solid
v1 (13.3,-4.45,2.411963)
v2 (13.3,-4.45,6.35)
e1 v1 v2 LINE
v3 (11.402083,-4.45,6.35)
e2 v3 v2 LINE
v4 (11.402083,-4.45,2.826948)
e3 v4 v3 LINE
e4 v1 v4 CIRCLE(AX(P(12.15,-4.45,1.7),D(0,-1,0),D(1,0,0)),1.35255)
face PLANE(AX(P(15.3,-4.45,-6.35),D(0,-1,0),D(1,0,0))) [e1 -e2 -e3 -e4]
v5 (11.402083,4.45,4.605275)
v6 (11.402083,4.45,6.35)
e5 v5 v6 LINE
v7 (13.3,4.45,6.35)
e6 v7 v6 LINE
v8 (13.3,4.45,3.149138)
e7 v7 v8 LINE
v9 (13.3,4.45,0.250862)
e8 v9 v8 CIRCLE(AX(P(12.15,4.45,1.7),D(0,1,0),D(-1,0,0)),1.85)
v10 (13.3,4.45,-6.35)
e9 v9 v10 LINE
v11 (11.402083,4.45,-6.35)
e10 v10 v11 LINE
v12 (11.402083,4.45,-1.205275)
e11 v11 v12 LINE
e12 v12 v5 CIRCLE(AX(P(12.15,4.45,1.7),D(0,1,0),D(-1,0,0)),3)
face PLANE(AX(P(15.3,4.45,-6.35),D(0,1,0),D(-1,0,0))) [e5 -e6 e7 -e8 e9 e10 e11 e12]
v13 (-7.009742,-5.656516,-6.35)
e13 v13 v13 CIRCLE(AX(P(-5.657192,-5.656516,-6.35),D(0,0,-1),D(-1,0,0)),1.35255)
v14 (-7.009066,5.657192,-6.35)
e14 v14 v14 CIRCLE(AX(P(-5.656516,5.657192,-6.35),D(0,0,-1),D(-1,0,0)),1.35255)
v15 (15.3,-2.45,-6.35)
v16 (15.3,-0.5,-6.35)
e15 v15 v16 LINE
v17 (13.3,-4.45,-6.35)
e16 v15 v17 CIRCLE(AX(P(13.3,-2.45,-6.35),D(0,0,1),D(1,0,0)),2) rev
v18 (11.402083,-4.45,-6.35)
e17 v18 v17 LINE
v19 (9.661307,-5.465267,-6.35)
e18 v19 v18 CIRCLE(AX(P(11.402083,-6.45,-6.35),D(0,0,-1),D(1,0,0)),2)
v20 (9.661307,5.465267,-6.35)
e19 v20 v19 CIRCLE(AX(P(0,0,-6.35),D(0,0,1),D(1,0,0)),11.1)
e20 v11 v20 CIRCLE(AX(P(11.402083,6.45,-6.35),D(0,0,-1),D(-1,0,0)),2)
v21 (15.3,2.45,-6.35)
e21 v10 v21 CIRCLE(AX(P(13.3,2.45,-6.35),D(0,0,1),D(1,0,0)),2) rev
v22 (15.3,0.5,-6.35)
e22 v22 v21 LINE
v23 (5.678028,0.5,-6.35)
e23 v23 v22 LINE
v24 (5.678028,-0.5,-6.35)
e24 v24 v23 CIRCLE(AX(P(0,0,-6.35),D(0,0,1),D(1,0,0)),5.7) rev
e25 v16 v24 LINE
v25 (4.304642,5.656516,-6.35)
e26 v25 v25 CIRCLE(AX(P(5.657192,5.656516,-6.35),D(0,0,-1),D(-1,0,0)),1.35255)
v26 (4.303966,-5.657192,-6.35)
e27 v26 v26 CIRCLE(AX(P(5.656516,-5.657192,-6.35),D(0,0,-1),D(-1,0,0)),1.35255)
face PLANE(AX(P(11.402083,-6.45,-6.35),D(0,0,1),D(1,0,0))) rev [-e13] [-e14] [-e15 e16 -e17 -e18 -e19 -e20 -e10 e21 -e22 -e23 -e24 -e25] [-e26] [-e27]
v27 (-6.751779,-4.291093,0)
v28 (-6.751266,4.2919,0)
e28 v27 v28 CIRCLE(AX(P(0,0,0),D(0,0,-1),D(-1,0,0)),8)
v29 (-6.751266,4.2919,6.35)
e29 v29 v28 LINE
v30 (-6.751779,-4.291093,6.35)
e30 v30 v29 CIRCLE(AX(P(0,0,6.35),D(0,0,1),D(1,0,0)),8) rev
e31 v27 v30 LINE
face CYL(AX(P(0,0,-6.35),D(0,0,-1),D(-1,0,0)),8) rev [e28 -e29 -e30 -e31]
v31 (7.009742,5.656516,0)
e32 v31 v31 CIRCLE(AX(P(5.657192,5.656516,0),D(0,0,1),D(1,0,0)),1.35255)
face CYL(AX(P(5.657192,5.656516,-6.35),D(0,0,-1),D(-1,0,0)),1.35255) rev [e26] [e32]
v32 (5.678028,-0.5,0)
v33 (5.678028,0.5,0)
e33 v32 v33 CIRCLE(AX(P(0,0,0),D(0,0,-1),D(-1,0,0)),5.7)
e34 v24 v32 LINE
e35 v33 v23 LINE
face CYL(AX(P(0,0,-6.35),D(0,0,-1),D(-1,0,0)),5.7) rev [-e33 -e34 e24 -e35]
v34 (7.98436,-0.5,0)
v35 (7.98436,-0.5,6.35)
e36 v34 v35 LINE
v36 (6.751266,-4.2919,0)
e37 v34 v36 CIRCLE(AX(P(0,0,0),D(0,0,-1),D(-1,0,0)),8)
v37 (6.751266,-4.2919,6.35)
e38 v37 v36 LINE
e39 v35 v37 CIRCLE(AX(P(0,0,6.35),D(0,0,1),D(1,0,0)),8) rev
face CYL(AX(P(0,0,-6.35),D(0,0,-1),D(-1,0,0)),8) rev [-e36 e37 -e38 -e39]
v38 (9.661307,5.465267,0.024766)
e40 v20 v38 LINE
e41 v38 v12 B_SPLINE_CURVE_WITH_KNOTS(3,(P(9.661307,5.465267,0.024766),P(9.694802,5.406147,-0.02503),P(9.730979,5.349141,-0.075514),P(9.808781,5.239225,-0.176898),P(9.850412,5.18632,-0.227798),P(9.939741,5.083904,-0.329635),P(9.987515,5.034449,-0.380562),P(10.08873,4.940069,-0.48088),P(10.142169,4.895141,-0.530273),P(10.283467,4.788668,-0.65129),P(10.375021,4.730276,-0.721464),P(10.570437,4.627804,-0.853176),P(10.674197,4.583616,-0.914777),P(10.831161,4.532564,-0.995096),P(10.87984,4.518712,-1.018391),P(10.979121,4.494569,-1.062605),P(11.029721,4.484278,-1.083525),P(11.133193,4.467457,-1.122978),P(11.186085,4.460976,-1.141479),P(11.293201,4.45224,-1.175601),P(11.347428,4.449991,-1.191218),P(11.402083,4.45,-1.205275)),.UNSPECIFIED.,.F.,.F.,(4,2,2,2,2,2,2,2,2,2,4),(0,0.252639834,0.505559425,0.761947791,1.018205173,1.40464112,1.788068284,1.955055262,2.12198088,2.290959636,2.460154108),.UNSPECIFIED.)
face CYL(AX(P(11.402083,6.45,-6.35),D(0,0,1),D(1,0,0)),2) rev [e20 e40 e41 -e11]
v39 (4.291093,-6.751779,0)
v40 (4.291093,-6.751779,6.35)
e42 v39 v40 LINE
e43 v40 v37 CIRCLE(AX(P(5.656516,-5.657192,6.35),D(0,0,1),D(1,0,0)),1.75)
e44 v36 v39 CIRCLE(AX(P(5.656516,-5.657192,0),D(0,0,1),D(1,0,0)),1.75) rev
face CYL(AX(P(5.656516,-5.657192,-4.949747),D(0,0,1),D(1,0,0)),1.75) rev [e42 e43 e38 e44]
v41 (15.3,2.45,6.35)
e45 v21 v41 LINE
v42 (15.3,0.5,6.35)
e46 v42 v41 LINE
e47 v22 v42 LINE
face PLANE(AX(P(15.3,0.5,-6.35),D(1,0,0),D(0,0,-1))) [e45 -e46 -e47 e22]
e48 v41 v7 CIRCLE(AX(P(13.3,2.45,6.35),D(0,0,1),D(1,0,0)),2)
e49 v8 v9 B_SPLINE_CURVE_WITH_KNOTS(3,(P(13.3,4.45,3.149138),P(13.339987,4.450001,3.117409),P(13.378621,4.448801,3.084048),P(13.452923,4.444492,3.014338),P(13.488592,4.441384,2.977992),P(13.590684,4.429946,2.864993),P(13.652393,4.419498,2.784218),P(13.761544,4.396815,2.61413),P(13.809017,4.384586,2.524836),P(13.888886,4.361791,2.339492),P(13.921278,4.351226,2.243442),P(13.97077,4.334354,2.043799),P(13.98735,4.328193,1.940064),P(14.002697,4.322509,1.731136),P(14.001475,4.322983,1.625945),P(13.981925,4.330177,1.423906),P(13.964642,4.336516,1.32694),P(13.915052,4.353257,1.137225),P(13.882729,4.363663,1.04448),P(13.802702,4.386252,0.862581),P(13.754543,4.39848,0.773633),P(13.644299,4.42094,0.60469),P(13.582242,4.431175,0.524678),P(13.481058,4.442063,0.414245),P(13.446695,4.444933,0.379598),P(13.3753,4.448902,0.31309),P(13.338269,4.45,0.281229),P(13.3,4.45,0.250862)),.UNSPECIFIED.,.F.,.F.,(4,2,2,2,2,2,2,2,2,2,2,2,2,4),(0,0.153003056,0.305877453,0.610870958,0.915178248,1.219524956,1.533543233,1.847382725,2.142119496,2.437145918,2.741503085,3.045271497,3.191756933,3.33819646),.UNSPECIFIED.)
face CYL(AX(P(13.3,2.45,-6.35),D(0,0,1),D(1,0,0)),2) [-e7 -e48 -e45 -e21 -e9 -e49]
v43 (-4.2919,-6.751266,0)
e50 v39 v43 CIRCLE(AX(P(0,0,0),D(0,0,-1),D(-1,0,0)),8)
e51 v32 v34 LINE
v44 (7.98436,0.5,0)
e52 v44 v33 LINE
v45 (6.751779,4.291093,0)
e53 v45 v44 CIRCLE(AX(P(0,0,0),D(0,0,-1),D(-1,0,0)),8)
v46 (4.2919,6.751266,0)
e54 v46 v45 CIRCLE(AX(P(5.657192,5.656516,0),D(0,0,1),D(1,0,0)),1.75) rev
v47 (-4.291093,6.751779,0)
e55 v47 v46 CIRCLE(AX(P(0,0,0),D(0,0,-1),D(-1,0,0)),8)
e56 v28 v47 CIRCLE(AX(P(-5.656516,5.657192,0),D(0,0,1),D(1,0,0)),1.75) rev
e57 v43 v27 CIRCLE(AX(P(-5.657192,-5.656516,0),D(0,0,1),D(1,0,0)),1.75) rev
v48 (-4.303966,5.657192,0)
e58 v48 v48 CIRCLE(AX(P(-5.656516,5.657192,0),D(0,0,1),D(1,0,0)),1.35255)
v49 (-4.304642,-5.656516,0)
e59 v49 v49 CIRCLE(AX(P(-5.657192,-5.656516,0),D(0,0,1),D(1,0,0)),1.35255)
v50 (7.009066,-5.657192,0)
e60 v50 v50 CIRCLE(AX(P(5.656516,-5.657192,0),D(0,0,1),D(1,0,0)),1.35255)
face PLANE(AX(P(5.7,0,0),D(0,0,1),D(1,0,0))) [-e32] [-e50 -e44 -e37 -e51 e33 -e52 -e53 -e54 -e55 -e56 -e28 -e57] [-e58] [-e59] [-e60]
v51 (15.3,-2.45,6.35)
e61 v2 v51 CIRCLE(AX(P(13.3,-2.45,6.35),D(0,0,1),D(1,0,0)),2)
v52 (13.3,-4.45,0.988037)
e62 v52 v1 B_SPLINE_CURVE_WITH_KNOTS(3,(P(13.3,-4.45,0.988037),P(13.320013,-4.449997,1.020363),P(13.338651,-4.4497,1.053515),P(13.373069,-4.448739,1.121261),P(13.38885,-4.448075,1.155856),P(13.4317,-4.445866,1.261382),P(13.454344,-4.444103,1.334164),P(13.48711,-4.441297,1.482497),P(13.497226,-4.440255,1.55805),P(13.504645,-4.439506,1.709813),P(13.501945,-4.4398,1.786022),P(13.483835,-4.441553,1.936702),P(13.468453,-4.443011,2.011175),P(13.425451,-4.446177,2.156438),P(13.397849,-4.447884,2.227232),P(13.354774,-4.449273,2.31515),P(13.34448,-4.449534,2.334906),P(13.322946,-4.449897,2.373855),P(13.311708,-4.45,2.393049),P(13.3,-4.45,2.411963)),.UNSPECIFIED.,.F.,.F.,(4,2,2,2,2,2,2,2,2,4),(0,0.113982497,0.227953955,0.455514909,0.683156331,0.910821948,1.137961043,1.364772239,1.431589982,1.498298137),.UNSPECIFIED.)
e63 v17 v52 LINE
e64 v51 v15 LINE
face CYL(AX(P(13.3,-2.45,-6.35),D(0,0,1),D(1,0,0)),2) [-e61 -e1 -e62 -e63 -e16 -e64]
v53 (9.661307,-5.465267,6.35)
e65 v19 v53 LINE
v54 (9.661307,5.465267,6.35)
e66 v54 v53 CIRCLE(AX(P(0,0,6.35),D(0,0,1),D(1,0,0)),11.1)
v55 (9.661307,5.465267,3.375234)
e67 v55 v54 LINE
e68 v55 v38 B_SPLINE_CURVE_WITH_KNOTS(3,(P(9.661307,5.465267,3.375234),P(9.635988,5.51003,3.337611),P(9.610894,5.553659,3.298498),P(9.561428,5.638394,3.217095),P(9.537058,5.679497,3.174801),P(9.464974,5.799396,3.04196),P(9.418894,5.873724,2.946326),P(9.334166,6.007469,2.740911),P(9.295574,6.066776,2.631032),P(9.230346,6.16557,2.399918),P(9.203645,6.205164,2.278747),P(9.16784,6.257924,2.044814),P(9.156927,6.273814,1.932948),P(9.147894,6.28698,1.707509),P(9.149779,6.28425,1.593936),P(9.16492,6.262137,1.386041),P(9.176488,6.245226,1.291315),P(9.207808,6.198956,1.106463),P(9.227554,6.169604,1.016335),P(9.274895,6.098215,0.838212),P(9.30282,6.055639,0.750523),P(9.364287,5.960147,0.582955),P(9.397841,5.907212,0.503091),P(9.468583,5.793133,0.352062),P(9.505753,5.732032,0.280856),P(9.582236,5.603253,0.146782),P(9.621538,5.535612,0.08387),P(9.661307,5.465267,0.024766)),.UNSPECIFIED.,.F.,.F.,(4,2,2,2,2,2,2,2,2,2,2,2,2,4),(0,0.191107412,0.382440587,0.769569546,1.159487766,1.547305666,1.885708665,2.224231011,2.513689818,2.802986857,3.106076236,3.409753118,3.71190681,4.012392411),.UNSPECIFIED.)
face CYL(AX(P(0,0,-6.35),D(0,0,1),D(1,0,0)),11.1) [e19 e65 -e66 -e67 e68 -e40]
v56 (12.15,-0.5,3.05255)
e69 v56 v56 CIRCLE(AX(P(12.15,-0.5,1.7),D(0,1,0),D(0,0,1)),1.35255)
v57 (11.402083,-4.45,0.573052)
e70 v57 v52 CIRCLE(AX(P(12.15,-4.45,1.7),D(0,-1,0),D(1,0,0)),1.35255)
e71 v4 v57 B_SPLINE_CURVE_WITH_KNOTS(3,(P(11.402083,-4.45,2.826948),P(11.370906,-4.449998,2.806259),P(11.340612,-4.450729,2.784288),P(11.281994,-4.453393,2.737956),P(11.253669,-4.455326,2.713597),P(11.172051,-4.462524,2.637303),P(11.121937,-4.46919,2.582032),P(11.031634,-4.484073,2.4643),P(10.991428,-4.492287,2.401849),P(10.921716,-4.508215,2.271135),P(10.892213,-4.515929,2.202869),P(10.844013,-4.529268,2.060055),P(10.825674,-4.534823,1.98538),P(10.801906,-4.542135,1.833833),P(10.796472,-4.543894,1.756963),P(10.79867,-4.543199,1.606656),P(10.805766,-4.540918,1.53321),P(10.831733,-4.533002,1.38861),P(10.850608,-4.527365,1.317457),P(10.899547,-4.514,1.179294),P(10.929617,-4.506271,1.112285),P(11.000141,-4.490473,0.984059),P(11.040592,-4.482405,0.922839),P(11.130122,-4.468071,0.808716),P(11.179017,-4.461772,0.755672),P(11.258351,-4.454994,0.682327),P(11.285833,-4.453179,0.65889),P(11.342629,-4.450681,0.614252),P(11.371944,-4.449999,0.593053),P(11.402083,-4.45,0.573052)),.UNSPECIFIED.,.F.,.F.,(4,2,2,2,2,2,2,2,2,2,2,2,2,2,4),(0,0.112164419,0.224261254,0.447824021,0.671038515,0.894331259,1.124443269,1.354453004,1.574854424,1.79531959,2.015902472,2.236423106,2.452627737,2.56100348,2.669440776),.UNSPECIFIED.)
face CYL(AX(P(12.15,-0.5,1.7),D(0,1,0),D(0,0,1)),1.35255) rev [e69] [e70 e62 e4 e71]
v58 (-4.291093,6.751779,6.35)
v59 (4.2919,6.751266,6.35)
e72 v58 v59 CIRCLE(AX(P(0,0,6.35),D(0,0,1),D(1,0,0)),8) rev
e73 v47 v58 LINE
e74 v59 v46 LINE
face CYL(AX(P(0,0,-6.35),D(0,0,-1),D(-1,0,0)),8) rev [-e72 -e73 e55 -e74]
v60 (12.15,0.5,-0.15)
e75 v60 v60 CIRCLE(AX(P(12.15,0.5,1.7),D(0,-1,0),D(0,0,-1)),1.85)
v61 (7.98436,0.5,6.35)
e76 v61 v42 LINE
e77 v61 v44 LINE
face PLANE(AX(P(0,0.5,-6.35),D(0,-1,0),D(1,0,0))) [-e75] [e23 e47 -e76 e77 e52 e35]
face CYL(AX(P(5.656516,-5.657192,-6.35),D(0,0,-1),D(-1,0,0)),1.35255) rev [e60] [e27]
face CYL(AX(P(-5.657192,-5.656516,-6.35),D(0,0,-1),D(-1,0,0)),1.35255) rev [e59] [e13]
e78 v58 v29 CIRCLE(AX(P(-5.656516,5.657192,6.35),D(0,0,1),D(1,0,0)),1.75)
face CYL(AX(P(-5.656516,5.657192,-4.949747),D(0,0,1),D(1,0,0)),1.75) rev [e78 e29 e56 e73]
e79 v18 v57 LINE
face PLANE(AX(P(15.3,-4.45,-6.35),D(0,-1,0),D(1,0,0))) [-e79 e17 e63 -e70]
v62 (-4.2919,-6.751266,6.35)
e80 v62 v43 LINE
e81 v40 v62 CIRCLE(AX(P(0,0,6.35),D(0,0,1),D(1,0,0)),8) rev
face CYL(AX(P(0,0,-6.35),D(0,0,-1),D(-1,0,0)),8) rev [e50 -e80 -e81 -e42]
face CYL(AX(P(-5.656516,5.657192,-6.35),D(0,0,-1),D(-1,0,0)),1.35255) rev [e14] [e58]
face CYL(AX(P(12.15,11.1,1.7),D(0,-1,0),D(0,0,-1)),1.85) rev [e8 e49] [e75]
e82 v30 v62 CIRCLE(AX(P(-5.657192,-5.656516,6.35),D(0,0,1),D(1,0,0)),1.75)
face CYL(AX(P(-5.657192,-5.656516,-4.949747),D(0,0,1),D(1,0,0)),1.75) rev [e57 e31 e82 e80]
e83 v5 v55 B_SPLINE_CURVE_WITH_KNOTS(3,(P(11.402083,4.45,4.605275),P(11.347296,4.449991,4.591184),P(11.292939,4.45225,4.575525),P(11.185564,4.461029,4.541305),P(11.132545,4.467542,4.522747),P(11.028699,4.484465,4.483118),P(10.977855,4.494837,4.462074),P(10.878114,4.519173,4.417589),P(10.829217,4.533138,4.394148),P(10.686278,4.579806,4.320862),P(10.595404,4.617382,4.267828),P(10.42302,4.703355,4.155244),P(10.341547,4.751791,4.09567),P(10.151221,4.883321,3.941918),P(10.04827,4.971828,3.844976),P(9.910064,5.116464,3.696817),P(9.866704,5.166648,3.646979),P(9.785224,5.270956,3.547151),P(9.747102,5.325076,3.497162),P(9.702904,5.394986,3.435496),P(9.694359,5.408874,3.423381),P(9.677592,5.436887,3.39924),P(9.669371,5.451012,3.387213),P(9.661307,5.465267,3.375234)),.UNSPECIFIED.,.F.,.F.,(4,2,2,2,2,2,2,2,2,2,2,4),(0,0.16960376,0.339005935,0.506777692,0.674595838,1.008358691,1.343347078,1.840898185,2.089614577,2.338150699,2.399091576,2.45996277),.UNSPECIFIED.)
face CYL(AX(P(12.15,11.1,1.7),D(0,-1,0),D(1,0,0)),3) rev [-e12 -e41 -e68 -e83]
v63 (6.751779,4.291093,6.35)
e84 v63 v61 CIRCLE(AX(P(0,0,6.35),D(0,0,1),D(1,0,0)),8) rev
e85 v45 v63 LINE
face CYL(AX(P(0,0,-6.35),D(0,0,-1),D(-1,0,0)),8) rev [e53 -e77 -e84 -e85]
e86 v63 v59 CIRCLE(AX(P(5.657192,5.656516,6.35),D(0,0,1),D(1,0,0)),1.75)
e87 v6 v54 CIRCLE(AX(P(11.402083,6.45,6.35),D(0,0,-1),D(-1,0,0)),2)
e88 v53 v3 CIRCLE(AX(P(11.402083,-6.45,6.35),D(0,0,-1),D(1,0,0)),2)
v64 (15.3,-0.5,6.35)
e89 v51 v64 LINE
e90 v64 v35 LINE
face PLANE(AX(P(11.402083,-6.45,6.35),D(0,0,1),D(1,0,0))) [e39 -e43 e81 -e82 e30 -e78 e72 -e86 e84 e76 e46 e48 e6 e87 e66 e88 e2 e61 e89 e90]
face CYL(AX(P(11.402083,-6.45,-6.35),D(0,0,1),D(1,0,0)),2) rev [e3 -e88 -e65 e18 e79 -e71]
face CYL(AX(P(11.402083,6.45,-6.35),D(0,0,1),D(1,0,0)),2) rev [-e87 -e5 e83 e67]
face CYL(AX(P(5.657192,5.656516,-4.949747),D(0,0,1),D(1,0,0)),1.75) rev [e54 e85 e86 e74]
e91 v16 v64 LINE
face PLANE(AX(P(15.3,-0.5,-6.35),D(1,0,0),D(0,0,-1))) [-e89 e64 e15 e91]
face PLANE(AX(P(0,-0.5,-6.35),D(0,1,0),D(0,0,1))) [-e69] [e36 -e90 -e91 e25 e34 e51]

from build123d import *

# Parameters (mm, degrees)
BOSS_EXTRUDE1_DEPTH       = 6.35
F_6_32_TAPPED_HOLE3_D     = 2.7051
SKETCH14_R                = 1.85
CUT_EXTRUDE6_DEPTH        = 21.223068511
F_6_32_TAPPED_HOLE5_D     = 2.7051
F_6_32_TAPPED_HOLE5_DEPTH = 50.8
F_6_32_TAPPED_HOLE5_TIP   = 0.81269403
SKETCH24_R                = 3
CUT_EXTRUDE26_DEPTH       = 36.126165479
FILLET1_R                 = 2
SKETCH28_R                = 1.75
CUT_EXTRUDE27_DEPTH       = 6.35


with BuildPart() as part:
    # Sketch1 → Boss-Extrude1 (new, symmetric)
    with BuildSketch(Plane.XY):
        with BuildLine():
            Line((0, 0), (0, 0.5))
            Line((0, 0.5), (15.3, 0.5))
            Line((15.3, 0.5), (15.3, 4.45))
            Line((15.3, 4.45), (11.402083143, 4.45))
            ThreePointArc((11.402083143, 4.45), (10.394478471, 4.722362068), (9.661307091, 5.465267176))
            ThreePointArc((9.661307091, 5.465267176), (-11.1, 0), (9.661307091, -5.465267176))
            ThreePointArc((9.661307091, -5.465267176), (10.394478471, -4.722362068), (11.402083143, -4.45))
            Line((11.402083143, -4.45), (15.3, -4.45))
            Line((15.3, -4.45), (15.3, -0.5))
            Line((15.3, -0.5), (0, -0.5))
            Line((0, -0.5), (0, 0))
        make_face()
    extrude(amount=BOSS_EXTRUDE1_DEPTH, both=True)

    # Sketch27 → Cut-Revolve1 (revolve, cut)
    with BuildSketch(Plane(origin=(0, 0, 0), x_dir=(1, 0, 0), z_dir=(0, 1, 0))):
        Polygon((0, 6.35), (5.7, 6.35), (5.7, 0), (8, 0), (8, -6.35), (0, -6.35), align=None)
    revolve(axis=Axis((0, 0, -6.35), (0, 0, 1)), mode=Mode.SUBTRACT)

    # #6-32 Tapped Hole3 (through all)
    with Locations(Plane(origin=(-5.656516225, 5.657192254, -6.35), x_dir=(-1, 0, 0), z_dir=(0, 0, -1))):
        with Locations((0, 0), (-11.313708479, -0.000676029), (-11.31303245, -11.314384508), (0.000676029, -11.313708479)):
            Hole(F_6_32_TAPPED_HOLE3_D / 2)

    # Sketch14 → Cut-Extrude6 (cut, through all)
    with BuildSketch(Plane.XZ.offset(-0.5)):
        with Locations(Location((12.15, 1.7, 0), (0, 0, 270))):
            Circle(SKETCH14_R)
    extrude(amount=-CUT_EXTRUDE6_DEPTH, mode=Mode.SUBTRACT)

    # #6-32 Tapped Hole5
    with Locations(Plane(origin=(0, -0.5, 0), x_dir=(-1, 0, 0), z_dir=(0, 1, 0))):
        with Locations((-12.15, 1.7)):
            Hole(F_6_32_TAPPED_HOLE5_D / 2, depth=F_6_32_TAPPED_HOLE5_DEPTH)
            with Locations((0, 0, -(F_6_32_TAPPED_HOLE5_DEPTH + F_6_32_TAPPED_HOLE5_TIP / 2))):  # 118° drill point
                Cone(0, F_6_32_TAPPED_HOLE5_D / 2, F_6_32_TAPPED_HOLE5_TIP, mode=Mode.SUBTRACT)

    # Sketch24 → Cut-Extrude26 (cut, through all)
    with BuildSketch(Plane(origin=(19.75, 4.45, 0), x_dir=(0, 0, -1), z_dir=(0, 1, 0))):
        with Locations((-1.7, 7.6)):
            Circle(SKETCH24_R)
    extrude(amount=CUT_EXTRUDE26_DEPTH, mode=Mode.SUBTRACT)

    # Fillet1
    # the kernel refuses this fillet: 2 mm, written as the material it takes off along each edge
    with BuildSketch(Plane(origin=(15.3, -4.45, -11.35), x_dir=(0, 1, 0), z_dir=(0, 0, 1))) as fillet1_piece_1:
        with BuildLine():
            CenterArc((FILLET1_R, FILLET1_R), FILLET1_R, 180, 90)
            Line((0, FILLET1_R), (0, 0))
            Line((0, 0), (FILLET1_R, 0))
        make_face()
    extrude(amount=22.7, mode=Mode.SUBTRACT)
    with BuildSketch(Plane(origin=(15.3, 4.45, -11.35), x_dir=(0, -1, 0), z_dir=(0, 0, 1))) as fillet1_piece_2:
        with BuildLine():
            CenterArc((FILLET1_R, -FILLET1_R), FILLET1_R, 90, 90)
            Line((0, -FILLET1_R), (0, 0))
            Line((0, 0), (FILLET1_R, 0))
        make_face()
    extrude(amount=22.7, mode=Mode.SUBTRACT)

    # Sketch28 → Cut-Extrude27 (cut)
    with BuildSketch(Plane.XY.offset(6.35)):
        with Locations((5.656516225, -5.657192254)):
            Circle(SKETCH28_R)
        with Locations((-5.656516225, 5.657192254)):
            Circle(SKETCH28_R)
        with Locations((5.657192254, 5.656516225)):
            Circle(SKETCH28_R)
        with Locations((-5.657192254, -5.656516225)):
            Circle(SKETCH28_R)
    extrude(amount=-CUT_EXTRUDE27_DEPTH, mode=Mode.SUBTRACT)


solid = part.part
